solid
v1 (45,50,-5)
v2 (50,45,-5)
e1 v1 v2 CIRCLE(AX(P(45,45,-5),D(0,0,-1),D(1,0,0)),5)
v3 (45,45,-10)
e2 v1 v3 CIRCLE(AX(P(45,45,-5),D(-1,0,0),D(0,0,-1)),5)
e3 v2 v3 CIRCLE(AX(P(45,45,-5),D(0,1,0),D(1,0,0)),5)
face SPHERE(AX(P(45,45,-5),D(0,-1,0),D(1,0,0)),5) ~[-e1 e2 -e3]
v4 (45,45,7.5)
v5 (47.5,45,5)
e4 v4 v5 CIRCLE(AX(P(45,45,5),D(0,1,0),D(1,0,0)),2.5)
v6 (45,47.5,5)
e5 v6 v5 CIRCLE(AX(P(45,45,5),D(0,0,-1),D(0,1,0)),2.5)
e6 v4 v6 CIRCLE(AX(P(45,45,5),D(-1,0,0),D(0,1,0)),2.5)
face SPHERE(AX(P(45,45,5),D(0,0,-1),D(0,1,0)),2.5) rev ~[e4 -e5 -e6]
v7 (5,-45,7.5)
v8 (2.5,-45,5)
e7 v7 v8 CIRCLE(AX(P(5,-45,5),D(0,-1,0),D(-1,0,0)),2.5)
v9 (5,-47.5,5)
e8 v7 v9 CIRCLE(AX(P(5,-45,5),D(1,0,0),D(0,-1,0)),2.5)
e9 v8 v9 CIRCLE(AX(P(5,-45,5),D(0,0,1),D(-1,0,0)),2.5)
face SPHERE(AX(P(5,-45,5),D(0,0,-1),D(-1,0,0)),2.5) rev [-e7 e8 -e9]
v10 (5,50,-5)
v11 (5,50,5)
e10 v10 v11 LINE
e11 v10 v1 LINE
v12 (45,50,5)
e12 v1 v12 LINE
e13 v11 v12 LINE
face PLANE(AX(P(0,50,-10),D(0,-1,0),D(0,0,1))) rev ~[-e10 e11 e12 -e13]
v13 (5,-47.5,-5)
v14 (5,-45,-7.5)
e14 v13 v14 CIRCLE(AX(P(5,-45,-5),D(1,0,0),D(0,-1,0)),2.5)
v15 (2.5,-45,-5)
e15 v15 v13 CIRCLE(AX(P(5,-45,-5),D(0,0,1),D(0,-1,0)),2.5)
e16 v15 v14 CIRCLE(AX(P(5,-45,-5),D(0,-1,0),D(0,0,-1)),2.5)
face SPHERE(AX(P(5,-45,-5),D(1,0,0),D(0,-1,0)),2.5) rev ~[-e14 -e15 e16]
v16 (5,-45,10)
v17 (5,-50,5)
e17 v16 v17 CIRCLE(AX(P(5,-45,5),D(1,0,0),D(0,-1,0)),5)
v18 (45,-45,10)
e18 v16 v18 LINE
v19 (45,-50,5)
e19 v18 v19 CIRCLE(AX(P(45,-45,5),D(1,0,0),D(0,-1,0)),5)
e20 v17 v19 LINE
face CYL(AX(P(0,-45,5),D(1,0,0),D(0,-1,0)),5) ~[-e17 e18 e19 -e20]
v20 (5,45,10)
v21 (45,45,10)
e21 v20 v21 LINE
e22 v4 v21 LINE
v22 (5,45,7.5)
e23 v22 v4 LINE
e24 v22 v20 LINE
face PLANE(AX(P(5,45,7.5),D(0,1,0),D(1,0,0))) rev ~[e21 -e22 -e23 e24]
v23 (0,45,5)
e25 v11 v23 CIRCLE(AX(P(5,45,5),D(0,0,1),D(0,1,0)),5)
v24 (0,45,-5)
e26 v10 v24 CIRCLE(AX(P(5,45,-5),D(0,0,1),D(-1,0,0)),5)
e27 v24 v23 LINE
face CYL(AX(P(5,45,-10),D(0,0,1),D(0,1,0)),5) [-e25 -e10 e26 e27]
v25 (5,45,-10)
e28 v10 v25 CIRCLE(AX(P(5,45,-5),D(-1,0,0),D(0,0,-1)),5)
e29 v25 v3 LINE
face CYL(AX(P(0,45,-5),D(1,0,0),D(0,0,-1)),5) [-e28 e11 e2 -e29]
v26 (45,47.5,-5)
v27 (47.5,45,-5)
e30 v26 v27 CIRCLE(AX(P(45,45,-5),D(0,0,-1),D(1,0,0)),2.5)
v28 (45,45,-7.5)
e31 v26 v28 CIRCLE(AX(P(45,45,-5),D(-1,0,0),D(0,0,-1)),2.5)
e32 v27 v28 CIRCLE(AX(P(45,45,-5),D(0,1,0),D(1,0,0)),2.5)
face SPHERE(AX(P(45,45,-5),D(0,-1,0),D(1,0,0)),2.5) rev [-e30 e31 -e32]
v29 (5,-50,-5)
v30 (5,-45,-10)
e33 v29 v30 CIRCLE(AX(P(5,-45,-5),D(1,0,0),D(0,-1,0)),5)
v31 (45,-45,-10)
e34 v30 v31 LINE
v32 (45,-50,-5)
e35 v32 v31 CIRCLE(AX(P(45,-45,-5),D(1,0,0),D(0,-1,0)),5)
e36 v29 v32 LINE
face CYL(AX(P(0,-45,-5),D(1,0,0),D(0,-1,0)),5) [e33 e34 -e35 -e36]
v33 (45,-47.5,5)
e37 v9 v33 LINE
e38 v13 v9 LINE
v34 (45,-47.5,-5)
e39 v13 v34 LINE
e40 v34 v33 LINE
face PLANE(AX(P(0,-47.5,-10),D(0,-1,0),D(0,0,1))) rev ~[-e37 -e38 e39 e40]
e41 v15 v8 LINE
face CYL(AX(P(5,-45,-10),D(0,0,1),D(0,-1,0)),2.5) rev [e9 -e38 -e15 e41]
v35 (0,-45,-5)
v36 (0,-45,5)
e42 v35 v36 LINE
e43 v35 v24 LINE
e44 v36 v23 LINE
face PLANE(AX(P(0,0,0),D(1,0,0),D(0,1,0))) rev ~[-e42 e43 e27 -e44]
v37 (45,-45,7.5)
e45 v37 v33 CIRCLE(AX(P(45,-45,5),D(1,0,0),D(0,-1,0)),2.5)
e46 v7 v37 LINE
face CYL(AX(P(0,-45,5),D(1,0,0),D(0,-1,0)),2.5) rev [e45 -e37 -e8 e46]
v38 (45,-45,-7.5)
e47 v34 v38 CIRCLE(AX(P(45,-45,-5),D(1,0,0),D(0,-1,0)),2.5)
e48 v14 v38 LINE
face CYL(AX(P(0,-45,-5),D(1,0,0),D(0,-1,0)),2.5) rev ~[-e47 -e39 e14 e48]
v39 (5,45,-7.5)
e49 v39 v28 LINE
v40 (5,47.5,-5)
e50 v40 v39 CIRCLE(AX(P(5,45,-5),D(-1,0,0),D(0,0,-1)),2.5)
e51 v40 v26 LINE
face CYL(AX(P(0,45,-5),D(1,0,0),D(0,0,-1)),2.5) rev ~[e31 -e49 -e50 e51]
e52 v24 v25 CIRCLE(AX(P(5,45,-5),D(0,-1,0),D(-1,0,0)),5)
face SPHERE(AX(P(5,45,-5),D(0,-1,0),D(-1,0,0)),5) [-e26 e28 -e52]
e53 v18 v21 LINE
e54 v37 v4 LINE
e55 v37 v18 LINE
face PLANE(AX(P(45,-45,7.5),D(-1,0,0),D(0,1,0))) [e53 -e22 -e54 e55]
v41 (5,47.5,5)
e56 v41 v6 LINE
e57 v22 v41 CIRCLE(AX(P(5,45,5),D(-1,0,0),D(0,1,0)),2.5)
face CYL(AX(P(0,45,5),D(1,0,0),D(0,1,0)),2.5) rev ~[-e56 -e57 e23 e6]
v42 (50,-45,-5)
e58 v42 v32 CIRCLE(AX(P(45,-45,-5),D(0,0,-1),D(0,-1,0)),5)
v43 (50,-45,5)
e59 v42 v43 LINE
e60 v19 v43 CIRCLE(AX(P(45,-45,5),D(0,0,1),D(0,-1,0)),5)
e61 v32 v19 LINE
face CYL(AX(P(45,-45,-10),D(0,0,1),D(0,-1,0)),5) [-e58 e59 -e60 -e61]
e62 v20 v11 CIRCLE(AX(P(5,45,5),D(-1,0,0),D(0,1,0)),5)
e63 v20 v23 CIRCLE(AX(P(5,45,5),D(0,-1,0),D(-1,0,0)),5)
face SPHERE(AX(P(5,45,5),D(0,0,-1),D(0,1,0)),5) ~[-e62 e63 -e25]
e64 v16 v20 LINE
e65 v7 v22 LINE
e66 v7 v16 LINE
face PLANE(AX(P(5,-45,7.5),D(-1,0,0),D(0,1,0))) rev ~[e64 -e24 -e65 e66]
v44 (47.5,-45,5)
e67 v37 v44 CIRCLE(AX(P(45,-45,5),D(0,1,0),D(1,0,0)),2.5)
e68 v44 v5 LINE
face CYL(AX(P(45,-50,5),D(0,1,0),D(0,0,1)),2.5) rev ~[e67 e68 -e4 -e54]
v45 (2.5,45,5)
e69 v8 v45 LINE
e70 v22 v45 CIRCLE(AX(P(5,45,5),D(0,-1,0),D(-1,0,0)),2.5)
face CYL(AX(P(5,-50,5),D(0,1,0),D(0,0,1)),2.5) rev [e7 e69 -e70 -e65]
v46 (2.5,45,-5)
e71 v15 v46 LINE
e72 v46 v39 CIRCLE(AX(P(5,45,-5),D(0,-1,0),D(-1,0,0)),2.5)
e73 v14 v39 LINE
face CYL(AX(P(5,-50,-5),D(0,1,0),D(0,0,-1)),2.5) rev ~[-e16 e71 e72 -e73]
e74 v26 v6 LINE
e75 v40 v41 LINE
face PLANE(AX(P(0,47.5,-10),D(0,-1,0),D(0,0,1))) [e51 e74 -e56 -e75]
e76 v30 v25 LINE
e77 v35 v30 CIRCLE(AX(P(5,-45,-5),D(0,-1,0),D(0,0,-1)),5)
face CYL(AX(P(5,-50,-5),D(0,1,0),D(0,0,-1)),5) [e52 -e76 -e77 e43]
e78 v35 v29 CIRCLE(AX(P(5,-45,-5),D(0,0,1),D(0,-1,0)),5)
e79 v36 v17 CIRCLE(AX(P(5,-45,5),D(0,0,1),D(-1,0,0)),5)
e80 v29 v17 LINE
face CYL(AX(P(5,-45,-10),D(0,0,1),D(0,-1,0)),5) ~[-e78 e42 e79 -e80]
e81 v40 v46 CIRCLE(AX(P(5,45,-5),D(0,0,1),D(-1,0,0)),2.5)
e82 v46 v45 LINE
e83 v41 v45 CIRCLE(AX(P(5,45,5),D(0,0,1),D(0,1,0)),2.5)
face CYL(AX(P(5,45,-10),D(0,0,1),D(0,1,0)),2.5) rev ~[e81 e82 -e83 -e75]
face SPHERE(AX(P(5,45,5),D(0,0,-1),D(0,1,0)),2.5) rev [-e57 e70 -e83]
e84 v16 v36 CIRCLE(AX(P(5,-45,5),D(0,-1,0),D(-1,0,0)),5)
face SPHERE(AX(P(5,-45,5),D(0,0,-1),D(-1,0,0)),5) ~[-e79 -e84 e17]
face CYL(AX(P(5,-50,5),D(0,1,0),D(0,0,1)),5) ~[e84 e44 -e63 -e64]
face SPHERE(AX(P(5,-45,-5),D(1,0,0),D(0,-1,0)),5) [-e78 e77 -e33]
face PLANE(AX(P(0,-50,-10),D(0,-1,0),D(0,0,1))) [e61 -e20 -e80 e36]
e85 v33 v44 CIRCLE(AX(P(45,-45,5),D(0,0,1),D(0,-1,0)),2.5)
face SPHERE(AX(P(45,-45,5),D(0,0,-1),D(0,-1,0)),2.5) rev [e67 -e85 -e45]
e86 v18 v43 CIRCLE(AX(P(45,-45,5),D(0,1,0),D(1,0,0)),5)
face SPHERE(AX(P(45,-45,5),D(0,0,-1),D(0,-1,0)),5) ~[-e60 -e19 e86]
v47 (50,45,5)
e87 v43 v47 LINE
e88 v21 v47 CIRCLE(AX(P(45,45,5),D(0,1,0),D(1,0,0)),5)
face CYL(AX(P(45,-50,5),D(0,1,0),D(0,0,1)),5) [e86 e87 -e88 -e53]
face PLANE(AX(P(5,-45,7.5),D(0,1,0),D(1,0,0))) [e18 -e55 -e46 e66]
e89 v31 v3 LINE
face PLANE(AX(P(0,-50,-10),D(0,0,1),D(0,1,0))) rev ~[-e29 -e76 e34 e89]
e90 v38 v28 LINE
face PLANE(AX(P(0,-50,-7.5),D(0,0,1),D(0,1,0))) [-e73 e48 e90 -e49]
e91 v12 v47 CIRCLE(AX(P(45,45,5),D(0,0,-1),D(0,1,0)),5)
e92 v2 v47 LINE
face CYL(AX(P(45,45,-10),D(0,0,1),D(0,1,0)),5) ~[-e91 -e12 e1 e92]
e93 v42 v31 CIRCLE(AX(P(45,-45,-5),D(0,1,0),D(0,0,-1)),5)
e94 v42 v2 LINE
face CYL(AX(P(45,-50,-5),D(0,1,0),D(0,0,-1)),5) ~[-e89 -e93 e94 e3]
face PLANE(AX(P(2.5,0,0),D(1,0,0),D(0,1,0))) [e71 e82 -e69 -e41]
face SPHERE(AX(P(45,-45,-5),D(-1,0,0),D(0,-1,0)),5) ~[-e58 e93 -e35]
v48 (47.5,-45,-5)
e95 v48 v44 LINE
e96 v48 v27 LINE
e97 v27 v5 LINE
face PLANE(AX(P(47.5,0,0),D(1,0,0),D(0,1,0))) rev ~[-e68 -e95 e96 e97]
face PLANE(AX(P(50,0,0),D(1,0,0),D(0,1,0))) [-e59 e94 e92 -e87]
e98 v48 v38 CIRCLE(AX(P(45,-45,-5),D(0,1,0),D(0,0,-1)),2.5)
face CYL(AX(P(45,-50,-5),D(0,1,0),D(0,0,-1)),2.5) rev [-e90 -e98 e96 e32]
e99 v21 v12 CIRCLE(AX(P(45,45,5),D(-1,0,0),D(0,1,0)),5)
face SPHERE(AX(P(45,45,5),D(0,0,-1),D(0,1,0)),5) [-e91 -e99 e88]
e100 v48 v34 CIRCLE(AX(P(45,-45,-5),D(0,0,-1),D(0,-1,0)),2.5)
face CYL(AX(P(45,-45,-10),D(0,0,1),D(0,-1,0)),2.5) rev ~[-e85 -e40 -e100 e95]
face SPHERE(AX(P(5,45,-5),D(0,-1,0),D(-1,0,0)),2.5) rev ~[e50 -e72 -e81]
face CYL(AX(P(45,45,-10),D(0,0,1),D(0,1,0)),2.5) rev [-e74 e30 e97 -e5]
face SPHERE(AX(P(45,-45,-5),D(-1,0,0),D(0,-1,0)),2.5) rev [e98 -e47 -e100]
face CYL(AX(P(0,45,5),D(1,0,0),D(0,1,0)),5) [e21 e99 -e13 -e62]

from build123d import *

# Parameters (mm, degrees)
F0_W     = 100
F0_H     = 20
F1_DEPTH = 50
F2_R     = 5
F3_T     = -2.5


# Not quite as in the source:
# - a shell that OpenCascade refuses in one call is made with other operations: the cavity is built on its own and cut out


with BuildPart() as f1:
    # F0 (on Right) → F1 (new body)
    with BuildSketch(Plane.YZ):
        Rectangle(F0_W, F0_H)
    extrude(amount=F1_DEPTH)

    # F2
    f2_edges = [f1.edges().sort_by_distance(p)[0] for p in [
        (25, -50, -10),
        (50, -50, 0),
        (0, -50, 0),
        (0, 0, -10),
        (50, 0, -10),
        (50, 50, 0),
        (0, 50, 0),
        (25, 50, -10),
        (25, 50, 10),
        (0, 0, 10),
        (25, -50, 10),
        (50, 0, 10),
    ]]
    fillet(f2_edges, radius=F2_R)

    # F3: a shell. OpenCascade refuses it in one call, so the cavity is built on its own and cut out:
    # the body offset inwards by the wall thickness, plus a prism from it out through each open face.
    f3_core = offset(f1.part, amount=F3_T, mode=Mode.PRIVATE)
    f3_exits = [f3_core.faces().sort_by_distance(p)[0] for p in [
        (25, 0, 7.5),
    ]]
    add(f3_core, mode=Mode.SUBTRACT)
    extrude(f3_exits, amount=-F3_T, mode=Mode.SUBTRACT)


solid = f1.part
